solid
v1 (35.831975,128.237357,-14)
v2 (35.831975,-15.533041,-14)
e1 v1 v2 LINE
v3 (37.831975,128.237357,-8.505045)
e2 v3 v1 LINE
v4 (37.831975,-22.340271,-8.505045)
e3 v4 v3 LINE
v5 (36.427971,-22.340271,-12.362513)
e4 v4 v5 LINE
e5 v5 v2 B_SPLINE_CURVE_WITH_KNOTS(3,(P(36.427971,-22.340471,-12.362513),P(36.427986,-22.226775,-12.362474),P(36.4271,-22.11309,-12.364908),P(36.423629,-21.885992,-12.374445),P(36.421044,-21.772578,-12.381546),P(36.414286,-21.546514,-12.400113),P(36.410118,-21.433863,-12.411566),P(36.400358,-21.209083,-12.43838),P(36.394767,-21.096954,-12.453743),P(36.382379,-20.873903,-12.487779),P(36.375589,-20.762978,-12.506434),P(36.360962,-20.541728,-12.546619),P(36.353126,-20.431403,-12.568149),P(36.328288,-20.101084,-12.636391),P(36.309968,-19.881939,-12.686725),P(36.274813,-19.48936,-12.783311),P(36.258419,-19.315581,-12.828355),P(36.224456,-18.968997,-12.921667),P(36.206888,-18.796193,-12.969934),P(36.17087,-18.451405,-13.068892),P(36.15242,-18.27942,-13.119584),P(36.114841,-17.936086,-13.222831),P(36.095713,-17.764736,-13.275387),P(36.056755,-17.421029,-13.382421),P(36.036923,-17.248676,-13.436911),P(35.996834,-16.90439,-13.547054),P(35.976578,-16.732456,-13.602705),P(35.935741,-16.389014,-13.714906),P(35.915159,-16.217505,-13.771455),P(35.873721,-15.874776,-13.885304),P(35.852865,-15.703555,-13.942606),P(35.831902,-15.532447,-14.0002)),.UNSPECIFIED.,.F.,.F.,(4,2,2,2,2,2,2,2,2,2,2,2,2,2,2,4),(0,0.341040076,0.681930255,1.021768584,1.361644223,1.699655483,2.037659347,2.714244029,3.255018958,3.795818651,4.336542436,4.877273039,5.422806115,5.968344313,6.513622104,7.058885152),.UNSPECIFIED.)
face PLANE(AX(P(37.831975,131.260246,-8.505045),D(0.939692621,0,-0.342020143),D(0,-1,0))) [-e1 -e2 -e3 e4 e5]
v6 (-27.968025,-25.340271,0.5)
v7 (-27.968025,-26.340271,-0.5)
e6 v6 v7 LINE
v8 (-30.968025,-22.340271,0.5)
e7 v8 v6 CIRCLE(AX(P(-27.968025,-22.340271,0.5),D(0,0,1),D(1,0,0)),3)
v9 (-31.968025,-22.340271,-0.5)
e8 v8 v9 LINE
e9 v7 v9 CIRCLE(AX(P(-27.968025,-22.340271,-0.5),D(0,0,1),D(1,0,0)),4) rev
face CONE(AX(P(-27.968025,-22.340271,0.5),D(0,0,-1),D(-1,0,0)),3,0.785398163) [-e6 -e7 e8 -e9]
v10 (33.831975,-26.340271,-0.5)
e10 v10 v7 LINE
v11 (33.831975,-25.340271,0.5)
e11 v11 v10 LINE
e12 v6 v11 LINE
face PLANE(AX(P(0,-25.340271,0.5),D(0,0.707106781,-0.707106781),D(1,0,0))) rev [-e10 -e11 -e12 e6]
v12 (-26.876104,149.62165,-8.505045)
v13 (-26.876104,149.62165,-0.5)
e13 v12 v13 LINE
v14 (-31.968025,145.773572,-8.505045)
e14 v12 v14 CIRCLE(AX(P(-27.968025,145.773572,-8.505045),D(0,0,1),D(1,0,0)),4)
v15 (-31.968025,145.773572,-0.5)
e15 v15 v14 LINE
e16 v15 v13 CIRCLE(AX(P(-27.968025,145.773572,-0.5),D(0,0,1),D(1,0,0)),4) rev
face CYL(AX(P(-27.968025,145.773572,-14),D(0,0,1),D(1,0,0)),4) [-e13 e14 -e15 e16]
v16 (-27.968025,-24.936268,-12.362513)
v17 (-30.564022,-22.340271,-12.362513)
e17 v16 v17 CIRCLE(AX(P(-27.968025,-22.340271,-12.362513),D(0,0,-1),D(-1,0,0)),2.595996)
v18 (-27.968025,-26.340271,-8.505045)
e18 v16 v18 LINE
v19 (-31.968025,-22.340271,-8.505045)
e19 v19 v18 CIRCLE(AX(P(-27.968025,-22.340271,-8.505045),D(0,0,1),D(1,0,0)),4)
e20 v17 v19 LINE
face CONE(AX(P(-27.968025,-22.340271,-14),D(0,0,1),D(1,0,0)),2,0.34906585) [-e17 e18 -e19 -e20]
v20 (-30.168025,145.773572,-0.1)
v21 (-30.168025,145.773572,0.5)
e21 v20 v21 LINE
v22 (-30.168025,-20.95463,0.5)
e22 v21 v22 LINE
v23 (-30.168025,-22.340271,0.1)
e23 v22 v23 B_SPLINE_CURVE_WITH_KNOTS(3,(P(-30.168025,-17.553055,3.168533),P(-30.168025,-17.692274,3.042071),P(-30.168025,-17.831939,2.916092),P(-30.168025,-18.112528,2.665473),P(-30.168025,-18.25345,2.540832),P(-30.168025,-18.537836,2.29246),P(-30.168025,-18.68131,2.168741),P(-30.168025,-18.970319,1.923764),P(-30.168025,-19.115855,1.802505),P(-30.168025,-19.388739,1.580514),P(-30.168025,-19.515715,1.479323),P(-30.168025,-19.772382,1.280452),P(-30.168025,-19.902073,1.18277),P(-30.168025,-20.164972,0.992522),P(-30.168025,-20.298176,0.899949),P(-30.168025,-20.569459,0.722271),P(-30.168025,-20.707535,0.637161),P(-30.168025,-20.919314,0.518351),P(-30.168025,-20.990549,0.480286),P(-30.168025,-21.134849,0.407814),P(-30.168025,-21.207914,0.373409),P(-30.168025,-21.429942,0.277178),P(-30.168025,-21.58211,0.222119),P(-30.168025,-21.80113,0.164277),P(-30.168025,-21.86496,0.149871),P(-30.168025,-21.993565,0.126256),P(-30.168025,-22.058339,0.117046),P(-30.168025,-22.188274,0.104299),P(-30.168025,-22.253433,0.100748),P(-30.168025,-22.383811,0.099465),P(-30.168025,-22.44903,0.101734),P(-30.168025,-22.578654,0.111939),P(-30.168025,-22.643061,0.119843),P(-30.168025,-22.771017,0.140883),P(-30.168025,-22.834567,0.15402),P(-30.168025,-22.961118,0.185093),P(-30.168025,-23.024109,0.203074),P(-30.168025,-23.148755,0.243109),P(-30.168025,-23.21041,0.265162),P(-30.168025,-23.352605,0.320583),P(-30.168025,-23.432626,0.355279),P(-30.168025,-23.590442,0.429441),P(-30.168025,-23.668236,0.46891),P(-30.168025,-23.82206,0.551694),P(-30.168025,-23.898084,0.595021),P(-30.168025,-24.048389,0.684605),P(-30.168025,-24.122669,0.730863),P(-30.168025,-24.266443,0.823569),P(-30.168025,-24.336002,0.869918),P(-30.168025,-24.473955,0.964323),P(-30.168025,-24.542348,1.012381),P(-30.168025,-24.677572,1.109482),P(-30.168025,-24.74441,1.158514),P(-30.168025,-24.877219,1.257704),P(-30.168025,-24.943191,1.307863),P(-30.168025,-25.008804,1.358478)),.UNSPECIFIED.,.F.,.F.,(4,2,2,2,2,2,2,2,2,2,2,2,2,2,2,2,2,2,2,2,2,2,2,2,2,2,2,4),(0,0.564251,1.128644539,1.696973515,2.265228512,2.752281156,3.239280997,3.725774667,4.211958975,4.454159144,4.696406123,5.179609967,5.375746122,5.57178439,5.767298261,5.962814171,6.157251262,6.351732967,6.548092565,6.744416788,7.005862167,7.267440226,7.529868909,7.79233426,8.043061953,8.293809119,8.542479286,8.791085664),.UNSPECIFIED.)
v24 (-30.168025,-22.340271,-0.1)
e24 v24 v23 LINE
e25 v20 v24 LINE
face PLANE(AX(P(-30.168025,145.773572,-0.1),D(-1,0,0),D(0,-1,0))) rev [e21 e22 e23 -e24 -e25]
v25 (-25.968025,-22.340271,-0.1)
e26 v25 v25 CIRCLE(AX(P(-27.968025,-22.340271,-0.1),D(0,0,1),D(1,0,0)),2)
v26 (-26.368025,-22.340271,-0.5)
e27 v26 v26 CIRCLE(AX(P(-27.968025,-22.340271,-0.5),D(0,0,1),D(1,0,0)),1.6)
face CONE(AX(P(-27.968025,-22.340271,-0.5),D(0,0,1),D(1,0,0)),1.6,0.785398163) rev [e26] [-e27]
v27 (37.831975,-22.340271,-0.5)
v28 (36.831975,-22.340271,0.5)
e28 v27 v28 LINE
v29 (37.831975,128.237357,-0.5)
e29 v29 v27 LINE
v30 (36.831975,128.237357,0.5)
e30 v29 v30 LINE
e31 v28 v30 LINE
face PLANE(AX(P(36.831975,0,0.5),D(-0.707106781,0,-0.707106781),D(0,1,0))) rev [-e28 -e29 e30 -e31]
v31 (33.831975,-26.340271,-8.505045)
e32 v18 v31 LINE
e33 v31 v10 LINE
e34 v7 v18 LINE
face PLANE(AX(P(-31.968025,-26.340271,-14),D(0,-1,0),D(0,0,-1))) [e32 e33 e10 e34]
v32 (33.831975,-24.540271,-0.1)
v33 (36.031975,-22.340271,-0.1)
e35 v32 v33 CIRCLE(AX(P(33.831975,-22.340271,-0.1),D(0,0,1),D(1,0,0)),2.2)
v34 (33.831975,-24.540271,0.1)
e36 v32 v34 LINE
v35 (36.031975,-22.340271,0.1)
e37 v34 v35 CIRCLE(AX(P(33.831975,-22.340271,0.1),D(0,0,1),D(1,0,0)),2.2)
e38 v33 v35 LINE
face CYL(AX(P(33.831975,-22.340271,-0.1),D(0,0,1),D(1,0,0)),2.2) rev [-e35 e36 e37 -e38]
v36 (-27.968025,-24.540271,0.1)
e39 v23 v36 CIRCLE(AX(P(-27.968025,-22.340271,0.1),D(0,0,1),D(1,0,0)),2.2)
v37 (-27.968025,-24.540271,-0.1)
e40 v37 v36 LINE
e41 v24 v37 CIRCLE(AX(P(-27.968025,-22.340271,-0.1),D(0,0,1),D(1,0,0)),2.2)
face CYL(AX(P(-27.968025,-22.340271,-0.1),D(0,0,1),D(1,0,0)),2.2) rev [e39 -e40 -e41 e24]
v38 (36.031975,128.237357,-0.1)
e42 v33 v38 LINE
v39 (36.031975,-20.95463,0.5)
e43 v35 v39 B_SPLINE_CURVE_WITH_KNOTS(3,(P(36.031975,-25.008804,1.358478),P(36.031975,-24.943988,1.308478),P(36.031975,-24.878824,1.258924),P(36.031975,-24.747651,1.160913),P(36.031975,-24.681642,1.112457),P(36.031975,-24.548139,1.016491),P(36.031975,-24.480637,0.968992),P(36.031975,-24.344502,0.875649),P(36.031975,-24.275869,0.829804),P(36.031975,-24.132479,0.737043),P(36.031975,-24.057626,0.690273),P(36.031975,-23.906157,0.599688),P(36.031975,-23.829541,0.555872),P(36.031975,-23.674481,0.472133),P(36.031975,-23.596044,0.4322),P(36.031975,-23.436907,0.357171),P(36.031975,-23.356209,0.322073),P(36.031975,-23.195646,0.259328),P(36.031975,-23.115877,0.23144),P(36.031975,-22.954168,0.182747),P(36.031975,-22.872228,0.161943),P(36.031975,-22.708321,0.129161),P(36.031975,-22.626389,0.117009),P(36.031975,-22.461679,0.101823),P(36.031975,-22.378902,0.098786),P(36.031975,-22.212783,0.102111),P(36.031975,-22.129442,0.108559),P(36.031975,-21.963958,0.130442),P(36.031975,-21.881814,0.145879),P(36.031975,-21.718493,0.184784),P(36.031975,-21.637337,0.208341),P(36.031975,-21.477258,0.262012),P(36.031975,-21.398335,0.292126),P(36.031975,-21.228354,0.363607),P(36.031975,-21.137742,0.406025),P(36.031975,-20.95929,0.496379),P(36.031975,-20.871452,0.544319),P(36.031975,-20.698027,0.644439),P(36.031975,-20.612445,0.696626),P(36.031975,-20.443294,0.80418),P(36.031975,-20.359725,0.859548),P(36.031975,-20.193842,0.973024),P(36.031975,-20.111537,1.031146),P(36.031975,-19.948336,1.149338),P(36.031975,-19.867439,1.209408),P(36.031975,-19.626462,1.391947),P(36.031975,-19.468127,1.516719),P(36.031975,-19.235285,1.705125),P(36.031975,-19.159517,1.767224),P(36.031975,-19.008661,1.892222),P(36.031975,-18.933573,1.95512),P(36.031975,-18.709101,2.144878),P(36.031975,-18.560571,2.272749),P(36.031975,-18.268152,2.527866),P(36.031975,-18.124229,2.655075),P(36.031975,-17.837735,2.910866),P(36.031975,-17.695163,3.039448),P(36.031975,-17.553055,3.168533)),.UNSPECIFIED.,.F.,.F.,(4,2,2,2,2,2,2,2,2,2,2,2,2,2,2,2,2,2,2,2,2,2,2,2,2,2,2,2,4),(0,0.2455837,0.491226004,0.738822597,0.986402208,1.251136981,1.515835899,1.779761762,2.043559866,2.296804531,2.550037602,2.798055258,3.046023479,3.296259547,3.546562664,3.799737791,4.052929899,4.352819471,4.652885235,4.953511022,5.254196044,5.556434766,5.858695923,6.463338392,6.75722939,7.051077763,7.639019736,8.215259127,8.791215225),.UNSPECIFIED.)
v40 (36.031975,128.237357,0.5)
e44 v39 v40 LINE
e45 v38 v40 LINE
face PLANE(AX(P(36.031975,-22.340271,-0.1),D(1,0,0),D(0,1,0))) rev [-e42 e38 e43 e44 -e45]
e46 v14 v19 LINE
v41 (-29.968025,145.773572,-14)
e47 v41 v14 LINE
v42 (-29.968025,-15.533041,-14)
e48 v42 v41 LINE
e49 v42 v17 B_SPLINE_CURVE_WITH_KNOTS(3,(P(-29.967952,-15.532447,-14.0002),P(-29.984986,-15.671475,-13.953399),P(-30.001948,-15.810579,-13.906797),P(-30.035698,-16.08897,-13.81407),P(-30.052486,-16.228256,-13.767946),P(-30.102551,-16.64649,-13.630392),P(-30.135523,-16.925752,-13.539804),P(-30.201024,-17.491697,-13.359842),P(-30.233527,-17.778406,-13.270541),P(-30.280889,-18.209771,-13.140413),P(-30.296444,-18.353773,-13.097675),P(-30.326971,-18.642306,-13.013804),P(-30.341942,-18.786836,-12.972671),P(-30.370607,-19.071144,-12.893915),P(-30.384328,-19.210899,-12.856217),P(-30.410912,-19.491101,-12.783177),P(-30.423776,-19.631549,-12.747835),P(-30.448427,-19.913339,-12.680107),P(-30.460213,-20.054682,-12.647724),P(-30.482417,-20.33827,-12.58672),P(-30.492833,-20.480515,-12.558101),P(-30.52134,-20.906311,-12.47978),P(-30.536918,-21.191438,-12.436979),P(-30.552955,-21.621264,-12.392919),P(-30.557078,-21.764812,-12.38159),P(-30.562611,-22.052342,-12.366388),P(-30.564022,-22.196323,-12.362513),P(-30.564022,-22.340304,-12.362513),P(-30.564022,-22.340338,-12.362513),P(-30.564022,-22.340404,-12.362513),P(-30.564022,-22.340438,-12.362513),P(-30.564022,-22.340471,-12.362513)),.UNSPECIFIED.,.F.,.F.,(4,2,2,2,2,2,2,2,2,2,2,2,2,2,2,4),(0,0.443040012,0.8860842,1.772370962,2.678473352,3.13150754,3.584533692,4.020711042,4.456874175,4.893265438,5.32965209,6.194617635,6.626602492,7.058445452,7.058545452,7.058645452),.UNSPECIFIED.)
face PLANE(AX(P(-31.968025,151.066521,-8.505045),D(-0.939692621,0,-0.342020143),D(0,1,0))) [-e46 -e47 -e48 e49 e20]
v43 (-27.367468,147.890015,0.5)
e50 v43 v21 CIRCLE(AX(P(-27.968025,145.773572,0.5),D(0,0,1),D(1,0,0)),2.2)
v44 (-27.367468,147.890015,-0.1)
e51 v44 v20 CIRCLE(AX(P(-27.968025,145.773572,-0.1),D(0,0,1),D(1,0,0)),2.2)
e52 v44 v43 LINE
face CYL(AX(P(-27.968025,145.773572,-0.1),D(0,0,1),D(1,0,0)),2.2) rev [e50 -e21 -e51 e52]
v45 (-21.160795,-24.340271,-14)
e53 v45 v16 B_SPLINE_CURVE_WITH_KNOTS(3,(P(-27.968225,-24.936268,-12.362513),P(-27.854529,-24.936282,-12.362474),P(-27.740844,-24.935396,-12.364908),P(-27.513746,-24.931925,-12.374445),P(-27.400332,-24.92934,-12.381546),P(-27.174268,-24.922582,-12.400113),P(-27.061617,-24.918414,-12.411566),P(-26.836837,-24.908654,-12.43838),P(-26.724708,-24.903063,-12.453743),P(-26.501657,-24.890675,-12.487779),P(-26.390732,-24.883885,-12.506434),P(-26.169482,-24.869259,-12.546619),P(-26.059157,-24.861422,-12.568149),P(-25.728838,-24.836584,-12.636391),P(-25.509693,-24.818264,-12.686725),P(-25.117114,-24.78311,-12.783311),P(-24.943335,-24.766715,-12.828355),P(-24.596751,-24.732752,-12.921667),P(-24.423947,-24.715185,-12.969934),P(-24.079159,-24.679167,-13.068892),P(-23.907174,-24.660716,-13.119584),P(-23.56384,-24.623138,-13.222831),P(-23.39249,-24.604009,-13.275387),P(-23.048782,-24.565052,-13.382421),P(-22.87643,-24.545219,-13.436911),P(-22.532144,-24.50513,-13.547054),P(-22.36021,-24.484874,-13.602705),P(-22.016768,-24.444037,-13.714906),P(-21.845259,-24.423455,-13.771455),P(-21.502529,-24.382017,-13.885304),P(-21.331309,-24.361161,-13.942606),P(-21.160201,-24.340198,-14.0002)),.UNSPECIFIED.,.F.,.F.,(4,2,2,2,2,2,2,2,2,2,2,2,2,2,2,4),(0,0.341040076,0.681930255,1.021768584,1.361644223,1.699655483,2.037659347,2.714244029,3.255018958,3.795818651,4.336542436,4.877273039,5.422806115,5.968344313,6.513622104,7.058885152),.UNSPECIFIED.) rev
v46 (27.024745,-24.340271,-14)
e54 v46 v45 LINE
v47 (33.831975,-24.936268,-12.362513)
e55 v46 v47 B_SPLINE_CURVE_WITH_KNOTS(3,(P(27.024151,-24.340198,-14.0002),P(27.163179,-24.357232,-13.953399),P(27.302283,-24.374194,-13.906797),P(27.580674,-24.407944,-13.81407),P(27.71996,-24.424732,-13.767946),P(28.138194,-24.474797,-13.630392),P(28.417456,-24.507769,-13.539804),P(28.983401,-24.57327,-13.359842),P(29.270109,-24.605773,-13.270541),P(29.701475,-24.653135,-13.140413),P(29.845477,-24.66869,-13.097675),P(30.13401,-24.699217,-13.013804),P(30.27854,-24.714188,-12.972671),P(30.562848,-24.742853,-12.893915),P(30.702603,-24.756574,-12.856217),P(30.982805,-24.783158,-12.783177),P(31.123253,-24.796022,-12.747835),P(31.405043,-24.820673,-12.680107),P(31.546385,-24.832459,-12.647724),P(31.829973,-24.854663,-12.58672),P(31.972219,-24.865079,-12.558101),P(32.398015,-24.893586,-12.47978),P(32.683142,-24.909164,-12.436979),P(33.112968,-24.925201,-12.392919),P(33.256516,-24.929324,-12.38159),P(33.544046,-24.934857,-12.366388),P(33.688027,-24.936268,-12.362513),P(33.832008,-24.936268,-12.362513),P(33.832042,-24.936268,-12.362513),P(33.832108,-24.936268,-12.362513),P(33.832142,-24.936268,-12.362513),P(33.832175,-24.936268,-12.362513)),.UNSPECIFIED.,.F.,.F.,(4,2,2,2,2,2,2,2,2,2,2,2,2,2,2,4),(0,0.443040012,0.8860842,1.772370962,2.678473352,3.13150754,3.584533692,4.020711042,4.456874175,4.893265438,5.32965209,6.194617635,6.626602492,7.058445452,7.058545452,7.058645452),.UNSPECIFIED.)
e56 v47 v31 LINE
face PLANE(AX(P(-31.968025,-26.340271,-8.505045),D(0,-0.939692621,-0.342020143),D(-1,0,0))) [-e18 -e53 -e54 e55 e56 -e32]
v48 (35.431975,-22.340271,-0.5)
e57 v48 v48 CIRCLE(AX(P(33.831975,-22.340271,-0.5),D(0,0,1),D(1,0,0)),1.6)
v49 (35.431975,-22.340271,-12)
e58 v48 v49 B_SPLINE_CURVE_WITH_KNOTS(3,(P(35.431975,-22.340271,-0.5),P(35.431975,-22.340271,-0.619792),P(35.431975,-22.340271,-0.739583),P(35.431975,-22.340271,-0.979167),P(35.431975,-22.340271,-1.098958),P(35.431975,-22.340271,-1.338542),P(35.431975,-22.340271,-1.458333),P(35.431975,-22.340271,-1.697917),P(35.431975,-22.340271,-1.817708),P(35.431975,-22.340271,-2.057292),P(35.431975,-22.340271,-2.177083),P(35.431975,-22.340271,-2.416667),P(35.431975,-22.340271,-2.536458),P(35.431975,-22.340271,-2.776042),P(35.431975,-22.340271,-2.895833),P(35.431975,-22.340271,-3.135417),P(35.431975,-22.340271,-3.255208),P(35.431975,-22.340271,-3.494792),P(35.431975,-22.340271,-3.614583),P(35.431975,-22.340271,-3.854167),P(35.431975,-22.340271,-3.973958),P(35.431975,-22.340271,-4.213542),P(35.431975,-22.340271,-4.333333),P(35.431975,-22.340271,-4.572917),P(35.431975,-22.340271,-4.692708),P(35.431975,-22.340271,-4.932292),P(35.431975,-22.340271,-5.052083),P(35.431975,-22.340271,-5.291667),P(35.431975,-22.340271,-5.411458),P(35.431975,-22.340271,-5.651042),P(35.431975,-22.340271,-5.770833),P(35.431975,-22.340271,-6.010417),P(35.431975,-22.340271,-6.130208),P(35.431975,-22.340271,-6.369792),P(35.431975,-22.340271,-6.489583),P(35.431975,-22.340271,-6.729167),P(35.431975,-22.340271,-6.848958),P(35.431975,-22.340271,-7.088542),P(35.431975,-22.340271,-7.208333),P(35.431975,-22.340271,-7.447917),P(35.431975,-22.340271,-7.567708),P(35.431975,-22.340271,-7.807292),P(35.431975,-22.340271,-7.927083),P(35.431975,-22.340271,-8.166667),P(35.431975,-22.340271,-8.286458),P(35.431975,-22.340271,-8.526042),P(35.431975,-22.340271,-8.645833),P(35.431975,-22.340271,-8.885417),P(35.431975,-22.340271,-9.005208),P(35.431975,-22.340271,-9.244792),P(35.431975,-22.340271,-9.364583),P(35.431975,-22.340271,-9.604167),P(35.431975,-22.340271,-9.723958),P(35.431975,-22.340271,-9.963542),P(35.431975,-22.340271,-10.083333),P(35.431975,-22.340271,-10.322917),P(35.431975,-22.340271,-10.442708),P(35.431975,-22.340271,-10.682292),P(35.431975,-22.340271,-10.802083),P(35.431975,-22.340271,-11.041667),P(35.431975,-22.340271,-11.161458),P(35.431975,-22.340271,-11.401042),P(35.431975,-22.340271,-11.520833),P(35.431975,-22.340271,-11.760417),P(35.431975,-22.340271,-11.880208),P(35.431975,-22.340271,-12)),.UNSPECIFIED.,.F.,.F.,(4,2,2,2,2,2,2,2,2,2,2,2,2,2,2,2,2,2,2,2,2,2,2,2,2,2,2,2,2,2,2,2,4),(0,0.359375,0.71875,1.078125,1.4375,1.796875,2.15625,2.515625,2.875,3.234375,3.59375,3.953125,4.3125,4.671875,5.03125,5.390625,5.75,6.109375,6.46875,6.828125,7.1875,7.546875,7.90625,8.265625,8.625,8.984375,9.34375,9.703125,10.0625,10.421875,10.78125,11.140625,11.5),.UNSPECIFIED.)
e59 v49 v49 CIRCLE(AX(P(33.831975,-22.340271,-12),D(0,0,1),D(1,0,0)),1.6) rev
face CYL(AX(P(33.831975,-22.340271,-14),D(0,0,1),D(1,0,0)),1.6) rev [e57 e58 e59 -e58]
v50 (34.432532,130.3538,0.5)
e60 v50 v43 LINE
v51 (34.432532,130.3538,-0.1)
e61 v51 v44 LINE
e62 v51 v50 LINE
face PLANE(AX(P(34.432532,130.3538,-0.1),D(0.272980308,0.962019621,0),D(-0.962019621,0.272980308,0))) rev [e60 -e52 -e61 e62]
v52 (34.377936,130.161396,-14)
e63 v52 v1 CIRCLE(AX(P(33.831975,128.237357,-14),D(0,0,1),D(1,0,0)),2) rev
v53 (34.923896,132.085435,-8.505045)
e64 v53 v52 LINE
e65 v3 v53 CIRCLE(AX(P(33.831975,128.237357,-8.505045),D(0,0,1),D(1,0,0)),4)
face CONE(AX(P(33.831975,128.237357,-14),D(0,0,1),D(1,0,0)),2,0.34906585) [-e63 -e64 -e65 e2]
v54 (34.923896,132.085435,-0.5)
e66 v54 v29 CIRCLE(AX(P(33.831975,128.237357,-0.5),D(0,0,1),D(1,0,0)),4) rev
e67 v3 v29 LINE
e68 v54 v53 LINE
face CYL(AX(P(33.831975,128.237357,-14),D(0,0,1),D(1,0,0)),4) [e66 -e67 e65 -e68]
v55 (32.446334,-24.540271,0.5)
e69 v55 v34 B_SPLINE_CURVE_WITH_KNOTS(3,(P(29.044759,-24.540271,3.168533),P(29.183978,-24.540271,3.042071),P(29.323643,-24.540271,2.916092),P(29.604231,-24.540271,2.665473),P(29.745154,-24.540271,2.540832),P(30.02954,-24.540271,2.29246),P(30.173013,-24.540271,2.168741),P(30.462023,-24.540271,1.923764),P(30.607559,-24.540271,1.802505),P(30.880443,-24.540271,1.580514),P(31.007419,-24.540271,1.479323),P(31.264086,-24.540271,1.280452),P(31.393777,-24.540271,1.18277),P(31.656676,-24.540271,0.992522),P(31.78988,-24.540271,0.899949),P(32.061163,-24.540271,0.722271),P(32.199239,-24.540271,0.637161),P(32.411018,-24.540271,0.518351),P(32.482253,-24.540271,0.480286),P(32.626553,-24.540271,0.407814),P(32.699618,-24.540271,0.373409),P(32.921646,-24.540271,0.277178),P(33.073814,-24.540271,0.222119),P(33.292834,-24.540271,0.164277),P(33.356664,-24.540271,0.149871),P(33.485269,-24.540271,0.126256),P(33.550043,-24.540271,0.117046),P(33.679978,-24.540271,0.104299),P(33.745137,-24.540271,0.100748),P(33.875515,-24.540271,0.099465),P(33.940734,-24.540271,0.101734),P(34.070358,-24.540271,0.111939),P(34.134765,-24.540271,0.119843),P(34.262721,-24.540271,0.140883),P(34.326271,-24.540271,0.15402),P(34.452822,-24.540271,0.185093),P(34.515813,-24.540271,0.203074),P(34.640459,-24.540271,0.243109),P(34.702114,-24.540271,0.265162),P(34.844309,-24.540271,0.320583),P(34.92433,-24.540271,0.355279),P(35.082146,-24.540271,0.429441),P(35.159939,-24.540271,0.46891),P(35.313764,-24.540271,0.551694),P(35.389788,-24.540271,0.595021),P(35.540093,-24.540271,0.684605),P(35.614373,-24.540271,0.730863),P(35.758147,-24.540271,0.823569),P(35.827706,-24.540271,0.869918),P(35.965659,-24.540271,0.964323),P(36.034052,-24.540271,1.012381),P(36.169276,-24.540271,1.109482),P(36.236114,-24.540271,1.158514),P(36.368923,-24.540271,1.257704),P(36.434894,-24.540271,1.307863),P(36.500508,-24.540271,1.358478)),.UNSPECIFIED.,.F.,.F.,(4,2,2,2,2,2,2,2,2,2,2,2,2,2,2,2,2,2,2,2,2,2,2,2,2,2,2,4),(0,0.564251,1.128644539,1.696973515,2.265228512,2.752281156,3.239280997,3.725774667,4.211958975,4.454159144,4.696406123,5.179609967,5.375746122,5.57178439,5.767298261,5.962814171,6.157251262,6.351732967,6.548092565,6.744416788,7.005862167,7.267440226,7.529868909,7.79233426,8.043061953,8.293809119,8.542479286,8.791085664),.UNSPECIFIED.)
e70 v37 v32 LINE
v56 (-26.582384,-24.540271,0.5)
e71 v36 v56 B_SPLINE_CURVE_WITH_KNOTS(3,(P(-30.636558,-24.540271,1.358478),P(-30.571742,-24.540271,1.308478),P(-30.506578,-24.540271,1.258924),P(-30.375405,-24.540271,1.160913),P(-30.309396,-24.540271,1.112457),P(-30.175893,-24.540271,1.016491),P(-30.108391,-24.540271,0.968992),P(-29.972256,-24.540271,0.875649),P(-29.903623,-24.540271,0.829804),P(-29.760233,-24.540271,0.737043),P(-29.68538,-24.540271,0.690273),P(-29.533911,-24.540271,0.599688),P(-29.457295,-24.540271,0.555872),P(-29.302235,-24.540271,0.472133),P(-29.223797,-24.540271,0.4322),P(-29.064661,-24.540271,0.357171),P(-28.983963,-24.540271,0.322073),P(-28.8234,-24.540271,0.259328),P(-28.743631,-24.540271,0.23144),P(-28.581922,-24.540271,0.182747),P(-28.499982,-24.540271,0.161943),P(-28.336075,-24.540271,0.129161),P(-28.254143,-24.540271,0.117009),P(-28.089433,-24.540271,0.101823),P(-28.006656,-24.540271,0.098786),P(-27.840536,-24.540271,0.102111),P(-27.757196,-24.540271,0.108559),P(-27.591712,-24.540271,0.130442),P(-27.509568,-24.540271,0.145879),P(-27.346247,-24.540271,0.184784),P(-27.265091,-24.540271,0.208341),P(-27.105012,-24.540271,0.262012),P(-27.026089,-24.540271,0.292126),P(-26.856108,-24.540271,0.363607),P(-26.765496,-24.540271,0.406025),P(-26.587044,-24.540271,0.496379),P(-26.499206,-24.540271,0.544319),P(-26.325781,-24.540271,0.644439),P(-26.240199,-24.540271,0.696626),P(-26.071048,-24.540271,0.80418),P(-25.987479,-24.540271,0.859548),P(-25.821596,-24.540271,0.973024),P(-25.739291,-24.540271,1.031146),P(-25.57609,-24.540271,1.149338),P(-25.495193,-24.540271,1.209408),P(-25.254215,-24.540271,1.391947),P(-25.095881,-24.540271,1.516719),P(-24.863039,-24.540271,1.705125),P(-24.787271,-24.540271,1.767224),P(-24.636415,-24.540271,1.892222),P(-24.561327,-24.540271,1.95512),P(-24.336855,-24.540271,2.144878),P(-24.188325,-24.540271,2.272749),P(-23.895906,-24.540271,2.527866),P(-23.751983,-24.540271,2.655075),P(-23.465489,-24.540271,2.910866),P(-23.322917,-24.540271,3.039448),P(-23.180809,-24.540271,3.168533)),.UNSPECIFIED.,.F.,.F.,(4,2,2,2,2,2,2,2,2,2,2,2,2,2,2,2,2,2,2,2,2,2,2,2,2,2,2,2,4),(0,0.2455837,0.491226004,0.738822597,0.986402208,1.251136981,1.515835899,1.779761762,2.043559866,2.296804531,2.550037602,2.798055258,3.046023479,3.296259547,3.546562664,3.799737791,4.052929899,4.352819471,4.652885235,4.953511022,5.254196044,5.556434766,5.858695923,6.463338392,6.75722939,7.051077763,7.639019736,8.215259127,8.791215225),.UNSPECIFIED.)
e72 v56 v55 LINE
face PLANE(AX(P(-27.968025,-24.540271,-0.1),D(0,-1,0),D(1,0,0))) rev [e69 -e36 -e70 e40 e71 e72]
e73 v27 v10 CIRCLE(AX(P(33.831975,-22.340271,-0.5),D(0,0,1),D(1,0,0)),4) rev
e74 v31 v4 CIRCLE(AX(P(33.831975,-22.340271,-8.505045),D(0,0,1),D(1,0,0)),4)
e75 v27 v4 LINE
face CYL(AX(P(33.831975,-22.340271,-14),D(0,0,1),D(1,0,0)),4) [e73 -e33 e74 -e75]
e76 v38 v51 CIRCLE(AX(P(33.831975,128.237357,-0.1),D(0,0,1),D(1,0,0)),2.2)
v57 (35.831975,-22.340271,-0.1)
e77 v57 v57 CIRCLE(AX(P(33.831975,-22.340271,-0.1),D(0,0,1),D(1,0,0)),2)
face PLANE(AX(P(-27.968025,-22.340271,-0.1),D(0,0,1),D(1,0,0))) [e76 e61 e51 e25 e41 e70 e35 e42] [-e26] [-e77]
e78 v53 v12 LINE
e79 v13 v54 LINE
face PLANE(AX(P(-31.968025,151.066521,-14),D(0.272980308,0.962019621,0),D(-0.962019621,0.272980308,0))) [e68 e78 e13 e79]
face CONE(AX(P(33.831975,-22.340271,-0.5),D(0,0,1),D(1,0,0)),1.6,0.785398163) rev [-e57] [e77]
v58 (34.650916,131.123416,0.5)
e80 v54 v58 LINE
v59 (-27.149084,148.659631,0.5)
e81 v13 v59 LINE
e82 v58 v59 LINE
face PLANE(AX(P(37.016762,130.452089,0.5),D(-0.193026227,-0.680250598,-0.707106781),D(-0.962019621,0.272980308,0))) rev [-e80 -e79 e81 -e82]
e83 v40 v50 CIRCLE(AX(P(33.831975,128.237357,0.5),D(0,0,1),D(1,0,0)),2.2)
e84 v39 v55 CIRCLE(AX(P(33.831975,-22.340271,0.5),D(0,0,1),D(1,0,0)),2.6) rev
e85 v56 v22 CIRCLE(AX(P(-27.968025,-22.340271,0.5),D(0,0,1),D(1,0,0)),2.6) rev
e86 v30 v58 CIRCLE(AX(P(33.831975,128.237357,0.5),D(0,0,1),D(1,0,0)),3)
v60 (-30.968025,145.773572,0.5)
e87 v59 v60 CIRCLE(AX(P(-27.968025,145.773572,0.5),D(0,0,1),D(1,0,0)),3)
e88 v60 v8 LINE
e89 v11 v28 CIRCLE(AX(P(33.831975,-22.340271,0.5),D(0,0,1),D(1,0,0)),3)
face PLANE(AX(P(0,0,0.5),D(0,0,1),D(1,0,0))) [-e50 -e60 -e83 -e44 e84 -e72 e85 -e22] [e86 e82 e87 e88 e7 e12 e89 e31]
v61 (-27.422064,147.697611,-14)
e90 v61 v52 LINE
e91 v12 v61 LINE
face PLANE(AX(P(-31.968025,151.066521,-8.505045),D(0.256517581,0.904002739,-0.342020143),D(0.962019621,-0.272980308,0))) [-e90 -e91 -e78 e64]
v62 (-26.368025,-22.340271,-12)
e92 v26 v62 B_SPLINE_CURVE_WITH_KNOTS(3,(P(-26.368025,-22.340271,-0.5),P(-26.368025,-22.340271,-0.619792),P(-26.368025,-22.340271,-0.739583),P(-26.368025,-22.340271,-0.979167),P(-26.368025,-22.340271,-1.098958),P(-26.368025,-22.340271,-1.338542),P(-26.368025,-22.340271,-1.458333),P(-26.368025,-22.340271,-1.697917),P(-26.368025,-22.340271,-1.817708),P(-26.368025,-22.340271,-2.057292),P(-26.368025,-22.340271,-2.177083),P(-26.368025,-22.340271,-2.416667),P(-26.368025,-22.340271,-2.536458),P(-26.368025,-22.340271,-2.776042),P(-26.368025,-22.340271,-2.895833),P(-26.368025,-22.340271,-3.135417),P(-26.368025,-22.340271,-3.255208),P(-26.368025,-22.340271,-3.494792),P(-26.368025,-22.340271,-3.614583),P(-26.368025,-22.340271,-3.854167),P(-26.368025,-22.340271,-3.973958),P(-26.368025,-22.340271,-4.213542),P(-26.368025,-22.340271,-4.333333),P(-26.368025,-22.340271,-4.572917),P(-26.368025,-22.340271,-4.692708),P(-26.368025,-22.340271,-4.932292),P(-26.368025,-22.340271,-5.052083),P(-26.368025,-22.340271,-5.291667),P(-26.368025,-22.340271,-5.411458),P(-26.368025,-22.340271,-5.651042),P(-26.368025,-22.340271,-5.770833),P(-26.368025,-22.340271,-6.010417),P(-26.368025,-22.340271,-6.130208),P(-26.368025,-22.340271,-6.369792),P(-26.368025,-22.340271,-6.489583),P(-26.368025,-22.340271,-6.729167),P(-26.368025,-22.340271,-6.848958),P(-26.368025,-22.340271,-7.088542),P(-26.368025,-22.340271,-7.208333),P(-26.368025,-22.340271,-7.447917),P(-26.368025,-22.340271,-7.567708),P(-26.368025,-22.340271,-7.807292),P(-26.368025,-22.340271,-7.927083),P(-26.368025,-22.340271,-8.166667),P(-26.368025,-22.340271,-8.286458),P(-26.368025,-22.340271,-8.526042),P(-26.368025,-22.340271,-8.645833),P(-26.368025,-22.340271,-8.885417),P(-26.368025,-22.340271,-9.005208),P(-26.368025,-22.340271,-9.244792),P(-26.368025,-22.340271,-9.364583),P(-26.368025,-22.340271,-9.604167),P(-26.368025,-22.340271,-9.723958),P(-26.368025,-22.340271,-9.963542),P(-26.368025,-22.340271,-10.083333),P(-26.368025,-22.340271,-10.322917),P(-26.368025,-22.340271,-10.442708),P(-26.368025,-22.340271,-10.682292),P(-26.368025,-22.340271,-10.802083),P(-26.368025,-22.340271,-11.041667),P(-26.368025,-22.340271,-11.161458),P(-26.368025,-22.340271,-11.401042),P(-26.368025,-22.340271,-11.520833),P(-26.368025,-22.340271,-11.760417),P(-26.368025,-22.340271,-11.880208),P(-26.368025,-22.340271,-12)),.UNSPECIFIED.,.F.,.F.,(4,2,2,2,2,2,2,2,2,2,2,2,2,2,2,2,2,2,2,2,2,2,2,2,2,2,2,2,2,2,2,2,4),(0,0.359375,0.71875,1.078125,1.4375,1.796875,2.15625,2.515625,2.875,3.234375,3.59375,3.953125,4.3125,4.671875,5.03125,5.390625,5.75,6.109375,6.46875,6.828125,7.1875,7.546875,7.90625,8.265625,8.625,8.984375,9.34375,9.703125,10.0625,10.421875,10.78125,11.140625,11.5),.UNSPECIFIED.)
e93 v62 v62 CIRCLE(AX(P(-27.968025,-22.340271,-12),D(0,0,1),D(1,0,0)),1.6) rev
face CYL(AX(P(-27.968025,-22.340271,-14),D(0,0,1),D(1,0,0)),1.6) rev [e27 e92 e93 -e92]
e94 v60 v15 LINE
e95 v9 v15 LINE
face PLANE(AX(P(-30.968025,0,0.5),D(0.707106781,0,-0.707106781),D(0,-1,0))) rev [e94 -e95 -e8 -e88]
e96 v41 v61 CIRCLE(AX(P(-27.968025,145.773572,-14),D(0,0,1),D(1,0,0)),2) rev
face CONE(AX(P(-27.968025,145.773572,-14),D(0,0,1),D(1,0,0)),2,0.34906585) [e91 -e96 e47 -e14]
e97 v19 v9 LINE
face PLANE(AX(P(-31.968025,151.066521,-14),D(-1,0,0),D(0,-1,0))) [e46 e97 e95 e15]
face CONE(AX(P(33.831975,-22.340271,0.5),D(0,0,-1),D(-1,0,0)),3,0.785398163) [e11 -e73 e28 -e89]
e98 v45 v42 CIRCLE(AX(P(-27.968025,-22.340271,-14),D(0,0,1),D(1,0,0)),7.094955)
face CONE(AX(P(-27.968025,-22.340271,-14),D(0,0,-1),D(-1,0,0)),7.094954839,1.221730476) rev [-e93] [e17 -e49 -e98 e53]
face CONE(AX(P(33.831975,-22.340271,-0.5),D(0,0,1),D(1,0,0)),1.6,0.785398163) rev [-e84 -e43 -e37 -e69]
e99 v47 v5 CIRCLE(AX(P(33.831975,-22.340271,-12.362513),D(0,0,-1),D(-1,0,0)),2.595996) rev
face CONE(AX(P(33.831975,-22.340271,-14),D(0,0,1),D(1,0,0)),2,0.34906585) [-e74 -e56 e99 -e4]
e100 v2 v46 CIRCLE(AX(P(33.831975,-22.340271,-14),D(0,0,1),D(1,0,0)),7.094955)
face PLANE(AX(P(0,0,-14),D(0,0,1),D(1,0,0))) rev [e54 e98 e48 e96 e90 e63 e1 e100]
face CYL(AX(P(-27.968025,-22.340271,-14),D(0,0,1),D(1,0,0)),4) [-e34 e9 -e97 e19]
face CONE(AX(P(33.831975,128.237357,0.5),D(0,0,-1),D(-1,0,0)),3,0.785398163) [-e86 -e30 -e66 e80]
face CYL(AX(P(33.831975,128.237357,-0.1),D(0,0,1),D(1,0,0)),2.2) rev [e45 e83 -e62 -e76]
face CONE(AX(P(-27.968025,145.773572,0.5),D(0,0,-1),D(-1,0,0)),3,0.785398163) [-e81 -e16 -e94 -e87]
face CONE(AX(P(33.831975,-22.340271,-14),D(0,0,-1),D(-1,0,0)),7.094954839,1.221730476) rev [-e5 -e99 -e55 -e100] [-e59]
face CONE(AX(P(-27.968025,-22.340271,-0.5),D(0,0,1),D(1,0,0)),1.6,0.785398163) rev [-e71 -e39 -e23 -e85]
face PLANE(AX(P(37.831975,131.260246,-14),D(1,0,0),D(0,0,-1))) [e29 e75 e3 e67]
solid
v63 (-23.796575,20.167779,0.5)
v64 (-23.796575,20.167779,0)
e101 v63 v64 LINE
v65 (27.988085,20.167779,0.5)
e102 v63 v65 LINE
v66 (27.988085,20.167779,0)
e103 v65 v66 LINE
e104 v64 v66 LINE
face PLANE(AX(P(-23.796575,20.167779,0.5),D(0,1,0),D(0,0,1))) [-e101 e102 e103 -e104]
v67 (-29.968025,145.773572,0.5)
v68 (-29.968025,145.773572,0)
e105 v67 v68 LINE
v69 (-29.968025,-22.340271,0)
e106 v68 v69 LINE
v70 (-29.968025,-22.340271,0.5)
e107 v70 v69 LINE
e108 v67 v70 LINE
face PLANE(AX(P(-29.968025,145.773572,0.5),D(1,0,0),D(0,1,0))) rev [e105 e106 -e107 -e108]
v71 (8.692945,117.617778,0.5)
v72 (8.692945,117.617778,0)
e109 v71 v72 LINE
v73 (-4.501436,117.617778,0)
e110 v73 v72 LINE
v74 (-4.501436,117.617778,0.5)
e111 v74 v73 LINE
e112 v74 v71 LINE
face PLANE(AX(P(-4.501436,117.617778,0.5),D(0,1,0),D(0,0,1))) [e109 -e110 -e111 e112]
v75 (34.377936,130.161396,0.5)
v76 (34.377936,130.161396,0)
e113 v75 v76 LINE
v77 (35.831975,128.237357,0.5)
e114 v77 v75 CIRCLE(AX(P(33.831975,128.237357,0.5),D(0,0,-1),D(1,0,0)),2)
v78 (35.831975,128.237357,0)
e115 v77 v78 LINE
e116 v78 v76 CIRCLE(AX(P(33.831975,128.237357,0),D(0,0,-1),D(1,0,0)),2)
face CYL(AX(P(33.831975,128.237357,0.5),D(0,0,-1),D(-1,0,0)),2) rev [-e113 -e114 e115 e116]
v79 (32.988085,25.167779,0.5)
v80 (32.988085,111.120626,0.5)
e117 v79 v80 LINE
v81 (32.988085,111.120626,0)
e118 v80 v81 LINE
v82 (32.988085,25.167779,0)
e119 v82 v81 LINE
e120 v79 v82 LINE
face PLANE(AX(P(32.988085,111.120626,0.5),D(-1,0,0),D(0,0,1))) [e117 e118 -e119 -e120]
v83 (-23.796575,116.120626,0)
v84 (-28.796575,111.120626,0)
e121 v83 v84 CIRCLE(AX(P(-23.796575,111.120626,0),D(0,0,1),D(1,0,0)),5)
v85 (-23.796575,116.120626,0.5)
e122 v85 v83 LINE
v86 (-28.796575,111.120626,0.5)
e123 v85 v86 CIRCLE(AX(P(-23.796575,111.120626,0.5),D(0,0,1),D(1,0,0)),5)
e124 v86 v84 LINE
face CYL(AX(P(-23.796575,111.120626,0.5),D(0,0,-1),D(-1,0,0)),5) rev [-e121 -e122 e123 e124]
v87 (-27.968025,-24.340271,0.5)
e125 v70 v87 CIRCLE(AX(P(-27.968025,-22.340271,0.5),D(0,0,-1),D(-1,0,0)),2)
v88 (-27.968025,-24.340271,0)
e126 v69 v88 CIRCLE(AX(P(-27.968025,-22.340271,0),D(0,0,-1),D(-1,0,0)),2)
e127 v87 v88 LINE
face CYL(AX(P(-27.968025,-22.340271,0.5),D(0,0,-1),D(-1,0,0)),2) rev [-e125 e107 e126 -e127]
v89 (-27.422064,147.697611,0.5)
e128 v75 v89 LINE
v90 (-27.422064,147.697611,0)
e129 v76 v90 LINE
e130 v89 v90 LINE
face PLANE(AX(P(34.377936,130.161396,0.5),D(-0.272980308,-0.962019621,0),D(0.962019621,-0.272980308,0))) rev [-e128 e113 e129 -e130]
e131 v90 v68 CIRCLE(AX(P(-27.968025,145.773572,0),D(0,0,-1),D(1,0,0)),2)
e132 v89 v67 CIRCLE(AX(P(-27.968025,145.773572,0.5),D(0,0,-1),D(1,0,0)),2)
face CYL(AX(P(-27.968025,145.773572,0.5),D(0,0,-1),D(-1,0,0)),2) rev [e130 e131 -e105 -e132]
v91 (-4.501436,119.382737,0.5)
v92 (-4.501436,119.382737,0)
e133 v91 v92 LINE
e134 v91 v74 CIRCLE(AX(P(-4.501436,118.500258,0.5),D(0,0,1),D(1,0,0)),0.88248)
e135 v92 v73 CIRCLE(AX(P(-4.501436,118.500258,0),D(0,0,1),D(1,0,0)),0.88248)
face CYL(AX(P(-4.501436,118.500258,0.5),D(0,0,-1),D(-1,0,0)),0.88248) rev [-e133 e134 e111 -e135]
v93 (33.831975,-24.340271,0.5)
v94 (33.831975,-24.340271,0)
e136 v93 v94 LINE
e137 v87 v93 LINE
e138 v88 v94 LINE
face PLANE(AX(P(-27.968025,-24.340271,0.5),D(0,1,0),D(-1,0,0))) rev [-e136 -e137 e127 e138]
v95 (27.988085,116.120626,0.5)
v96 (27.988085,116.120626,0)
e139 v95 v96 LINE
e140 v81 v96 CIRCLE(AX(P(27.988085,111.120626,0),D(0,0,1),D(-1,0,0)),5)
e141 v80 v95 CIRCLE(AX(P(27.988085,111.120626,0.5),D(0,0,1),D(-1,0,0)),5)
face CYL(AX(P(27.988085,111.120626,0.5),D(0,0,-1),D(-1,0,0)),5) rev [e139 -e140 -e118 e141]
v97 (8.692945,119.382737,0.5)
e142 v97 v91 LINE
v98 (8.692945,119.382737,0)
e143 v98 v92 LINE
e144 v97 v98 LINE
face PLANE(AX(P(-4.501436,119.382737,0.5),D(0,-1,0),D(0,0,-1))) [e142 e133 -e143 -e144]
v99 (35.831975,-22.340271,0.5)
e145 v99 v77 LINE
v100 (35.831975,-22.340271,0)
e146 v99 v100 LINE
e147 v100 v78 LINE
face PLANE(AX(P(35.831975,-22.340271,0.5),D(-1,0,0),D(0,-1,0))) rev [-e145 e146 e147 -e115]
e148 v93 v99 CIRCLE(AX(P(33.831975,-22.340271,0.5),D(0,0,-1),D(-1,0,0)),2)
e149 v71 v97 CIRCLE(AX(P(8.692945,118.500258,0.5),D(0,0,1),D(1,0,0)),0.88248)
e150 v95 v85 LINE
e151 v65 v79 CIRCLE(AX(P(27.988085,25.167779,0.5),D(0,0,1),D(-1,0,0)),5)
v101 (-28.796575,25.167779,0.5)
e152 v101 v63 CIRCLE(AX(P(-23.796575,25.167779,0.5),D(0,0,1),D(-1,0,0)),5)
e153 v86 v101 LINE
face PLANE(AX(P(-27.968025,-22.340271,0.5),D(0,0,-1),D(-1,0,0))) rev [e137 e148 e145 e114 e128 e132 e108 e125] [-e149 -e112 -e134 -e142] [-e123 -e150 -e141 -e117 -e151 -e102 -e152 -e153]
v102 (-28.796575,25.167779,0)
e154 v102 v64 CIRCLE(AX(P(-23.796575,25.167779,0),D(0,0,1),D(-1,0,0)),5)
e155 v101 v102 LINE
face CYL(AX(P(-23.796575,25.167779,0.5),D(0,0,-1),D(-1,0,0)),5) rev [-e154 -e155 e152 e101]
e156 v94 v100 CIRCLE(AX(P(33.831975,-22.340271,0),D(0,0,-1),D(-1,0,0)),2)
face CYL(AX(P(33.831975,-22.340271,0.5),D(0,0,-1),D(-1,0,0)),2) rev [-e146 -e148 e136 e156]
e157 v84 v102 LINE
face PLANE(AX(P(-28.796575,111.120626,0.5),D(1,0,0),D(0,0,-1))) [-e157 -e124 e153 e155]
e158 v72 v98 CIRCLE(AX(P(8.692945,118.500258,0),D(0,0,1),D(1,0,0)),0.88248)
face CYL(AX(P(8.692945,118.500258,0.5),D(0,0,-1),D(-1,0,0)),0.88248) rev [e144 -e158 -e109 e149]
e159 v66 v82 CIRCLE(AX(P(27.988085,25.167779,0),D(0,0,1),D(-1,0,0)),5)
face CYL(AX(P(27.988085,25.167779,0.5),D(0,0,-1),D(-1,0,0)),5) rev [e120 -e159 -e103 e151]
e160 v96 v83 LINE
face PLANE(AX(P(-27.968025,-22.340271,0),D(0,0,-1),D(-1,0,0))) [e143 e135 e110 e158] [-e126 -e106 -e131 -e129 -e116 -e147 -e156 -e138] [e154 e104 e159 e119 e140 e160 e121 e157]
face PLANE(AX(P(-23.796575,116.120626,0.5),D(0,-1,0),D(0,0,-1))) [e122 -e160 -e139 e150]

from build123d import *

# Parameters (mm, degrees)
BOSS_EXTRUDE1_START = 0.5
SKETCH1_R           = 1.6
BOSS_EXTRUDE1_DEPTH = 14.5
FILLET1_R           = 4
CHAMFER1_SIZE       = 5.494954839
CHAMFER1_SIZE_2     = 2
CHAMFER2_SIZE       = 1
BOSS_EXTRUDE2_START = -0.5
BOSS_EXTRUDE2_DEPTH = 0.5
CUT_EXTRUDE2_DEPTH  = 0.6


with BuildPart() as part:
    # Sketch1 → Boss-Extrude1 (new body)
    with BuildSketch(Plane.XY.offset(BOSS_EXTRUDE1_START)):
        Polygon((-31.968025007, 151.066521257), (37.831974993, 131.260245954), (37.831974993, -26.340271098), (-31.968025007, -26.340271098), align=None)
        with Locations((-27.968025007, -22.340271098)):
            Circle(SKETCH1_R, mode=Mode.SUBTRACT)
        with Locations((33.831974993, -22.340271098)):
            Circle(SKETCH1_R, mode=Mode.SUBTRACT)
    extrude(amount=-BOSS_EXTRUDE1_DEPTH)

    # Fillet1
    fillet1_edges = [part.edges().sort_by_distance(p)[0] for p in [
        (-31.968025007, 151.066521257, -6.75),
        (37.831974993, 131.260245954, -6.75),
        (37.831974993, -26.340271098, -6.75),
        (-31.968025007, -26.340271098, -6.75),
    ]]
    fillet(fillet1_edges, radius=FILLET1_R)

    # Chamfer1
    # the kernel refuses this chamfer: 5.494954839, 2 mm, written as the material it takes off along each edge
    with BuildSketch(Plane(origin=(-27.968025007, -22.340271098, -14), x_dir=(1, 0, 0), z_dir=(0, -1, 0))) as chamfer1_piece_1:
        Polygon((1.6 + CHAMFER1_SIZE, 0), (1.6, CHAMFER1_SIZE_2), (1.6, 0), align=None)
    revolve(axis=Axis((-27.968025007, -22.340271098, -14), (0, 0, 1)), mode=Mode.SUBTRACT)
    with BuildSketch(Plane(origin=(33.831974993, -22.340271098, -14), x_dir=(1, 0, 0), z_dir=(0, -1, 0))) as chamfer1_piece_2:
        Polygon((1.6 + CHAMFER1_SIZE, 0), (1.6, CHAMFER1_SIZE_2), (1.6, 0), align=None)
    revolve(axis=Axis((33.831974993, -22.340271098, -14), (0, 0, 1)), mode=Mode.SUBTRACT)
    with BuildSketch(Plane(origin=(37.831974993, 128.237356706, -14), x_dir=(-0.9950833631817486, 0, -0.09904090225205021), z_dir=(0, -1, 0))) as chamfer1_piece_3:
        Polygon((CHAMFER1_SIZE_2 * 0.995083363182, -CHAMFER1_SIZE_2 * 0.0990409022521), (-CHAMFER1_SIZE * 0.0990409022504, -CHAMFER1_SIZE * 0.995083363165), (0, 0), align=None)
    extrude(amount=150.577627804, mode=Mode.SUBTRACT)
    with BuildSketch(Plane(origin=(-26.876103777, 149.621650287, -14), x_dir=(0.0035989882615877116, 0.012683322674999943, 0.9999130865277316), z_dir=(0.9620196212654089, -0.2729803075321726, 0))) as chamfer1_piece_4:
        Polygon((CHAMFER1_SIZE * 0.999913086511, CHAMFER1_SIZE * 0.0131840581984), (-CHAMFER1_SIZE_2 * 0.0131840581986, CHAMFER1_SIZE_2 * 0.999913086528), (0, 0), align=None)
    extrude(amount=64.239853984, mode=Mode.SUBTRACT)
    with BuildSketch(Plane(origin=(-31.968025007, -22.340271098, -14), x_dir=(0.9950833631817486, 0, -0.0990409022520504), z_dir=(0, 1, 0))) as chamfer1_piece_5:
        Polygon((CHAMFER1_SIZE_2 * 0.995083363182, -CHAMFER1_SIZE_2 * 0.0990409022521), (-CHAMFER1_SIZE * 0.0990409022504, -CHAMFER1_SIZE * 0.995083363165), (0, 0), align=None)
    extrude(amount=168.1138429, mode=Mode.SUBTRACT)
    with BuildSketch(Plane(origin=(33.831974993, -26.340271098, -14), x_dir=(0, 0.9950833631817486, -0.09904090225205021), z_dir=(-1, 0, 0))) as chamfer1_piece_6:
        Polygon((CHAMFER1_SIZE_2 * 0.995083363182, -CHAMFER1_SIZE_2 * 0.0990409022521), (-CHAMFER1_SIZE * 0.0990409022504, -CHAMFER1_SIZE * 0.995083363165), (0, 0), align=None)
    extrude(amount=61.8, mode=Mode.SUBTRACT)
    with BuildSketch(Plane(origin=(-27.968025007, 145.773571802, -14), x_dir=(0.2729803075321709, 0.9620196212654092, 0), z_dir=(0.9620196212654092, -0.2729803075321709, 0))) as chamfer1_piece_7:
        Polygon((4, CHAMFER1_SIZE), (4 - CHAMFER1_SIZE_2, 0), (4, 0), align=None)
    revolve(axis=Axis((-27.968025007, 145.773571802, -14), (0, 0, 1)), revolution_arc=105.841689768, mode=Mode.SUBTRACT)
    with BuildSketch(Plane(origin=(-27.968025007, -22.340271098, -14), x_dir=(0, -1, 0), z_dir=(1, 0, 0))) as chamfer1_piece_8:
        Polygon((4 - CHAMFER1_SIZE_2, 0), (4, -CHAMFER1_SIZE), (4, 0), align=None)
    revolve(axis=Axis((-27.968025007, -22.340271098, -14), (0, 0, -1)), revolution_arc=90, mode=Mode.SUBTRACT)
    with BuildSketch(Plane(origin=(33.831974993, -22.340271098, -14), x_dir=(1, 0, 0), z_dir=(0, 1, 0))) as chamfer1_piece_9:
        Polygon((4 - CHAMFER1_SIZE_2, 0), (4, -CHAMFER1_SIZE), (4, 0), align=None)
    revolve(axis=Axis((33.831974993, -22.340271098, -14), (0, 0, -1)), revolution_arc=90, mode=Mode.SUBTRACT)
    with BuildSketch(Plane(origin=(33.831974993, 128.237356706, -14), x_dir=(0.27298030753217006, 0.9620196212654094, 0), z_dir=(-0.9620196212654094, 0.27298030753217006, 0))) as chamfer1_piece_10:
        Polygon((4, -CHAMFER1_SIZE), (4 - CHAMFER1_SIZE_2, 0), (4, 0), align=None)
    revolve(axis=Axis((33.831974993, 128.237356706, -14), (0, 0, -1)), revolution_arc=74.158310232, mode=Mode.SUBTRACT)

    # Chamfer2
    chamfer2_edges = [part.edges().sort_by_distance(p)[0] for p in [
        (-29.568025007, -22.340271098, 0.5),
        (32.231974993, -22.340271098, 0.5),
        (37.831974993, 52.948542804, 0.5),
        (-31.968025007, 61.716650352, 0.5),
        (2.931974993, -26.340271098, 0.5),
        (4.023896223, 140.853542739, 0.5),
        (-30.379696116, 148.964785123, 0.5),
        (-30.796452132, -25.168698223, 0.5),
        (36.660402118, -25.168698223, 0.5),
        (37.023188314, 130.649027815, 0.5),
    ]]
    chamfer(chamfer2_edges, length=CHAMFER2_SIZE)

    # Sketch3 → Cut-Extrude2 (cut)
    with BuildSketch(Plane.XY.offset(0.5)):
        with BuildLine():
            Line((-27.968025007, -24.540271098), (33.831974993, -24.540271098))
            ThreePointArc((33.831974993, -24.540271098), (35.387609912, -23.895906017), (36.031974993, -22.340271098))
            Line((36.031974993, -22.340271098), (36.031974993, 128.237356706))
            ThreePointArc((36.031974993, 128.237356706), (35.58714232, 129.563775816), (34.43253167, 130.353799873))
            Line((34.43253167, 130.353799873), (-27.36746833, 147.890014969))
            ThreePointArc((-27.36746833, 147.890014969), (-29.294444117, 147.528739129), (-30.168025007, 145.773571802))
            Line((-30.168025007, 145.773571802), (-30.168025007, -22.340271098))
            ThreePointArc((-30.168025007, -22.340271098), (-29.523659926, -23.895906017), (-27.968025007, -24.540271098))
        make_face()
    extrude(amount=-CUT_EXTRUDE2_DEPTH, mode=Mode.SUBTRACT)


with BuildPart() as body_2:
    # Sketch2 → Boss-Extrude2 (new body)
    with BuildSketch(Plane.XY.offset(0.5).offset(BOSS_EXTRUDE2_START)):
        with BuildLine():
            Line((-27.968025007, -24.340271098), (33.831974993, -24.340271098))
            ThreePointArc((33.831974993, -24.340271098), (32.417761431, -20.926057536), (35.831974993, -22.340271098))
            Line((35.831974993, -22.340271098), (35.831974993, 128.237356706))
            ThreePointArc((35.831974993, 128.237356706), (32.236368332, 127.031521151), (34.377935608, 130.161395948))
            Line((34.377935608, 130.161395948), (-27.422064392, 147.697611045))
            ThreePointArc((-27.422064392, 147.697611045), (-26.762189452, 144.177965142), (-29.968025007, 145.773571802))
            Line((-29.968025007, 145.773571802), (-29.968025007, -22.340271098))
            ThreePointArc((-29.968025007, -22.340271098), (-26.553811445, -20.926057536), (-27.968025007, -24.340271098))
        make_face()
        with BuildLine():
            Line((-23.796575469, 116.120626103), (27.988084902, 116.120626103))
            ThreePointArc((27.988084902, 116.120626103), (31.523618808, 114.656160009), (32.988084902, 111.120626103))
            Line((32.988084902, 111.120626103), (32.988084902, 25.167778842))
            ThreePointArc((32.988084902, 25.167778842), (31.523618808, 21.632244936), (27.988084902, 20.167778842))
            Line((27.988084902, 20.167778842), (-23.796575469, 20.167778842))
            ThreePointArc((-23.796575469, 20.167778842), (-27.332109375, 21.632244936), (-28.796575469, 25.167778842))
            Line((-28.796575469, 25.167778842), (-28.796575469, 111.120626103))
            ThreePointArc((-28.796575469, 111.120626103), (-27.332109375, 114.656160009), (-23.796575469, 116.120626103))
        make_face(mode=Mode.SUBTRACT)
        with BuildLine():
            Line((-4.501435932, 119.382737334), (8.692945365, 119.382737334))
            ThreePointArc((8.692945365, 119.382737334), (9.575424971, 118.500257728), (8.692945365, 117.617778122))
            Line((8.692945365, 117.617778122), (-4.501435932, 117.617778122))
            ThreePointArc((-4.501435932, 117.617778122), (-5.383915538, 118.500257728), (-4.501435932, 119.382737334))
        make_face(mode=Mode.SUBTRACT)
    extrude(amount=BOSS_EXTRUDE2_DEPTH)


solid = Compound([part.part, body_2.part])
